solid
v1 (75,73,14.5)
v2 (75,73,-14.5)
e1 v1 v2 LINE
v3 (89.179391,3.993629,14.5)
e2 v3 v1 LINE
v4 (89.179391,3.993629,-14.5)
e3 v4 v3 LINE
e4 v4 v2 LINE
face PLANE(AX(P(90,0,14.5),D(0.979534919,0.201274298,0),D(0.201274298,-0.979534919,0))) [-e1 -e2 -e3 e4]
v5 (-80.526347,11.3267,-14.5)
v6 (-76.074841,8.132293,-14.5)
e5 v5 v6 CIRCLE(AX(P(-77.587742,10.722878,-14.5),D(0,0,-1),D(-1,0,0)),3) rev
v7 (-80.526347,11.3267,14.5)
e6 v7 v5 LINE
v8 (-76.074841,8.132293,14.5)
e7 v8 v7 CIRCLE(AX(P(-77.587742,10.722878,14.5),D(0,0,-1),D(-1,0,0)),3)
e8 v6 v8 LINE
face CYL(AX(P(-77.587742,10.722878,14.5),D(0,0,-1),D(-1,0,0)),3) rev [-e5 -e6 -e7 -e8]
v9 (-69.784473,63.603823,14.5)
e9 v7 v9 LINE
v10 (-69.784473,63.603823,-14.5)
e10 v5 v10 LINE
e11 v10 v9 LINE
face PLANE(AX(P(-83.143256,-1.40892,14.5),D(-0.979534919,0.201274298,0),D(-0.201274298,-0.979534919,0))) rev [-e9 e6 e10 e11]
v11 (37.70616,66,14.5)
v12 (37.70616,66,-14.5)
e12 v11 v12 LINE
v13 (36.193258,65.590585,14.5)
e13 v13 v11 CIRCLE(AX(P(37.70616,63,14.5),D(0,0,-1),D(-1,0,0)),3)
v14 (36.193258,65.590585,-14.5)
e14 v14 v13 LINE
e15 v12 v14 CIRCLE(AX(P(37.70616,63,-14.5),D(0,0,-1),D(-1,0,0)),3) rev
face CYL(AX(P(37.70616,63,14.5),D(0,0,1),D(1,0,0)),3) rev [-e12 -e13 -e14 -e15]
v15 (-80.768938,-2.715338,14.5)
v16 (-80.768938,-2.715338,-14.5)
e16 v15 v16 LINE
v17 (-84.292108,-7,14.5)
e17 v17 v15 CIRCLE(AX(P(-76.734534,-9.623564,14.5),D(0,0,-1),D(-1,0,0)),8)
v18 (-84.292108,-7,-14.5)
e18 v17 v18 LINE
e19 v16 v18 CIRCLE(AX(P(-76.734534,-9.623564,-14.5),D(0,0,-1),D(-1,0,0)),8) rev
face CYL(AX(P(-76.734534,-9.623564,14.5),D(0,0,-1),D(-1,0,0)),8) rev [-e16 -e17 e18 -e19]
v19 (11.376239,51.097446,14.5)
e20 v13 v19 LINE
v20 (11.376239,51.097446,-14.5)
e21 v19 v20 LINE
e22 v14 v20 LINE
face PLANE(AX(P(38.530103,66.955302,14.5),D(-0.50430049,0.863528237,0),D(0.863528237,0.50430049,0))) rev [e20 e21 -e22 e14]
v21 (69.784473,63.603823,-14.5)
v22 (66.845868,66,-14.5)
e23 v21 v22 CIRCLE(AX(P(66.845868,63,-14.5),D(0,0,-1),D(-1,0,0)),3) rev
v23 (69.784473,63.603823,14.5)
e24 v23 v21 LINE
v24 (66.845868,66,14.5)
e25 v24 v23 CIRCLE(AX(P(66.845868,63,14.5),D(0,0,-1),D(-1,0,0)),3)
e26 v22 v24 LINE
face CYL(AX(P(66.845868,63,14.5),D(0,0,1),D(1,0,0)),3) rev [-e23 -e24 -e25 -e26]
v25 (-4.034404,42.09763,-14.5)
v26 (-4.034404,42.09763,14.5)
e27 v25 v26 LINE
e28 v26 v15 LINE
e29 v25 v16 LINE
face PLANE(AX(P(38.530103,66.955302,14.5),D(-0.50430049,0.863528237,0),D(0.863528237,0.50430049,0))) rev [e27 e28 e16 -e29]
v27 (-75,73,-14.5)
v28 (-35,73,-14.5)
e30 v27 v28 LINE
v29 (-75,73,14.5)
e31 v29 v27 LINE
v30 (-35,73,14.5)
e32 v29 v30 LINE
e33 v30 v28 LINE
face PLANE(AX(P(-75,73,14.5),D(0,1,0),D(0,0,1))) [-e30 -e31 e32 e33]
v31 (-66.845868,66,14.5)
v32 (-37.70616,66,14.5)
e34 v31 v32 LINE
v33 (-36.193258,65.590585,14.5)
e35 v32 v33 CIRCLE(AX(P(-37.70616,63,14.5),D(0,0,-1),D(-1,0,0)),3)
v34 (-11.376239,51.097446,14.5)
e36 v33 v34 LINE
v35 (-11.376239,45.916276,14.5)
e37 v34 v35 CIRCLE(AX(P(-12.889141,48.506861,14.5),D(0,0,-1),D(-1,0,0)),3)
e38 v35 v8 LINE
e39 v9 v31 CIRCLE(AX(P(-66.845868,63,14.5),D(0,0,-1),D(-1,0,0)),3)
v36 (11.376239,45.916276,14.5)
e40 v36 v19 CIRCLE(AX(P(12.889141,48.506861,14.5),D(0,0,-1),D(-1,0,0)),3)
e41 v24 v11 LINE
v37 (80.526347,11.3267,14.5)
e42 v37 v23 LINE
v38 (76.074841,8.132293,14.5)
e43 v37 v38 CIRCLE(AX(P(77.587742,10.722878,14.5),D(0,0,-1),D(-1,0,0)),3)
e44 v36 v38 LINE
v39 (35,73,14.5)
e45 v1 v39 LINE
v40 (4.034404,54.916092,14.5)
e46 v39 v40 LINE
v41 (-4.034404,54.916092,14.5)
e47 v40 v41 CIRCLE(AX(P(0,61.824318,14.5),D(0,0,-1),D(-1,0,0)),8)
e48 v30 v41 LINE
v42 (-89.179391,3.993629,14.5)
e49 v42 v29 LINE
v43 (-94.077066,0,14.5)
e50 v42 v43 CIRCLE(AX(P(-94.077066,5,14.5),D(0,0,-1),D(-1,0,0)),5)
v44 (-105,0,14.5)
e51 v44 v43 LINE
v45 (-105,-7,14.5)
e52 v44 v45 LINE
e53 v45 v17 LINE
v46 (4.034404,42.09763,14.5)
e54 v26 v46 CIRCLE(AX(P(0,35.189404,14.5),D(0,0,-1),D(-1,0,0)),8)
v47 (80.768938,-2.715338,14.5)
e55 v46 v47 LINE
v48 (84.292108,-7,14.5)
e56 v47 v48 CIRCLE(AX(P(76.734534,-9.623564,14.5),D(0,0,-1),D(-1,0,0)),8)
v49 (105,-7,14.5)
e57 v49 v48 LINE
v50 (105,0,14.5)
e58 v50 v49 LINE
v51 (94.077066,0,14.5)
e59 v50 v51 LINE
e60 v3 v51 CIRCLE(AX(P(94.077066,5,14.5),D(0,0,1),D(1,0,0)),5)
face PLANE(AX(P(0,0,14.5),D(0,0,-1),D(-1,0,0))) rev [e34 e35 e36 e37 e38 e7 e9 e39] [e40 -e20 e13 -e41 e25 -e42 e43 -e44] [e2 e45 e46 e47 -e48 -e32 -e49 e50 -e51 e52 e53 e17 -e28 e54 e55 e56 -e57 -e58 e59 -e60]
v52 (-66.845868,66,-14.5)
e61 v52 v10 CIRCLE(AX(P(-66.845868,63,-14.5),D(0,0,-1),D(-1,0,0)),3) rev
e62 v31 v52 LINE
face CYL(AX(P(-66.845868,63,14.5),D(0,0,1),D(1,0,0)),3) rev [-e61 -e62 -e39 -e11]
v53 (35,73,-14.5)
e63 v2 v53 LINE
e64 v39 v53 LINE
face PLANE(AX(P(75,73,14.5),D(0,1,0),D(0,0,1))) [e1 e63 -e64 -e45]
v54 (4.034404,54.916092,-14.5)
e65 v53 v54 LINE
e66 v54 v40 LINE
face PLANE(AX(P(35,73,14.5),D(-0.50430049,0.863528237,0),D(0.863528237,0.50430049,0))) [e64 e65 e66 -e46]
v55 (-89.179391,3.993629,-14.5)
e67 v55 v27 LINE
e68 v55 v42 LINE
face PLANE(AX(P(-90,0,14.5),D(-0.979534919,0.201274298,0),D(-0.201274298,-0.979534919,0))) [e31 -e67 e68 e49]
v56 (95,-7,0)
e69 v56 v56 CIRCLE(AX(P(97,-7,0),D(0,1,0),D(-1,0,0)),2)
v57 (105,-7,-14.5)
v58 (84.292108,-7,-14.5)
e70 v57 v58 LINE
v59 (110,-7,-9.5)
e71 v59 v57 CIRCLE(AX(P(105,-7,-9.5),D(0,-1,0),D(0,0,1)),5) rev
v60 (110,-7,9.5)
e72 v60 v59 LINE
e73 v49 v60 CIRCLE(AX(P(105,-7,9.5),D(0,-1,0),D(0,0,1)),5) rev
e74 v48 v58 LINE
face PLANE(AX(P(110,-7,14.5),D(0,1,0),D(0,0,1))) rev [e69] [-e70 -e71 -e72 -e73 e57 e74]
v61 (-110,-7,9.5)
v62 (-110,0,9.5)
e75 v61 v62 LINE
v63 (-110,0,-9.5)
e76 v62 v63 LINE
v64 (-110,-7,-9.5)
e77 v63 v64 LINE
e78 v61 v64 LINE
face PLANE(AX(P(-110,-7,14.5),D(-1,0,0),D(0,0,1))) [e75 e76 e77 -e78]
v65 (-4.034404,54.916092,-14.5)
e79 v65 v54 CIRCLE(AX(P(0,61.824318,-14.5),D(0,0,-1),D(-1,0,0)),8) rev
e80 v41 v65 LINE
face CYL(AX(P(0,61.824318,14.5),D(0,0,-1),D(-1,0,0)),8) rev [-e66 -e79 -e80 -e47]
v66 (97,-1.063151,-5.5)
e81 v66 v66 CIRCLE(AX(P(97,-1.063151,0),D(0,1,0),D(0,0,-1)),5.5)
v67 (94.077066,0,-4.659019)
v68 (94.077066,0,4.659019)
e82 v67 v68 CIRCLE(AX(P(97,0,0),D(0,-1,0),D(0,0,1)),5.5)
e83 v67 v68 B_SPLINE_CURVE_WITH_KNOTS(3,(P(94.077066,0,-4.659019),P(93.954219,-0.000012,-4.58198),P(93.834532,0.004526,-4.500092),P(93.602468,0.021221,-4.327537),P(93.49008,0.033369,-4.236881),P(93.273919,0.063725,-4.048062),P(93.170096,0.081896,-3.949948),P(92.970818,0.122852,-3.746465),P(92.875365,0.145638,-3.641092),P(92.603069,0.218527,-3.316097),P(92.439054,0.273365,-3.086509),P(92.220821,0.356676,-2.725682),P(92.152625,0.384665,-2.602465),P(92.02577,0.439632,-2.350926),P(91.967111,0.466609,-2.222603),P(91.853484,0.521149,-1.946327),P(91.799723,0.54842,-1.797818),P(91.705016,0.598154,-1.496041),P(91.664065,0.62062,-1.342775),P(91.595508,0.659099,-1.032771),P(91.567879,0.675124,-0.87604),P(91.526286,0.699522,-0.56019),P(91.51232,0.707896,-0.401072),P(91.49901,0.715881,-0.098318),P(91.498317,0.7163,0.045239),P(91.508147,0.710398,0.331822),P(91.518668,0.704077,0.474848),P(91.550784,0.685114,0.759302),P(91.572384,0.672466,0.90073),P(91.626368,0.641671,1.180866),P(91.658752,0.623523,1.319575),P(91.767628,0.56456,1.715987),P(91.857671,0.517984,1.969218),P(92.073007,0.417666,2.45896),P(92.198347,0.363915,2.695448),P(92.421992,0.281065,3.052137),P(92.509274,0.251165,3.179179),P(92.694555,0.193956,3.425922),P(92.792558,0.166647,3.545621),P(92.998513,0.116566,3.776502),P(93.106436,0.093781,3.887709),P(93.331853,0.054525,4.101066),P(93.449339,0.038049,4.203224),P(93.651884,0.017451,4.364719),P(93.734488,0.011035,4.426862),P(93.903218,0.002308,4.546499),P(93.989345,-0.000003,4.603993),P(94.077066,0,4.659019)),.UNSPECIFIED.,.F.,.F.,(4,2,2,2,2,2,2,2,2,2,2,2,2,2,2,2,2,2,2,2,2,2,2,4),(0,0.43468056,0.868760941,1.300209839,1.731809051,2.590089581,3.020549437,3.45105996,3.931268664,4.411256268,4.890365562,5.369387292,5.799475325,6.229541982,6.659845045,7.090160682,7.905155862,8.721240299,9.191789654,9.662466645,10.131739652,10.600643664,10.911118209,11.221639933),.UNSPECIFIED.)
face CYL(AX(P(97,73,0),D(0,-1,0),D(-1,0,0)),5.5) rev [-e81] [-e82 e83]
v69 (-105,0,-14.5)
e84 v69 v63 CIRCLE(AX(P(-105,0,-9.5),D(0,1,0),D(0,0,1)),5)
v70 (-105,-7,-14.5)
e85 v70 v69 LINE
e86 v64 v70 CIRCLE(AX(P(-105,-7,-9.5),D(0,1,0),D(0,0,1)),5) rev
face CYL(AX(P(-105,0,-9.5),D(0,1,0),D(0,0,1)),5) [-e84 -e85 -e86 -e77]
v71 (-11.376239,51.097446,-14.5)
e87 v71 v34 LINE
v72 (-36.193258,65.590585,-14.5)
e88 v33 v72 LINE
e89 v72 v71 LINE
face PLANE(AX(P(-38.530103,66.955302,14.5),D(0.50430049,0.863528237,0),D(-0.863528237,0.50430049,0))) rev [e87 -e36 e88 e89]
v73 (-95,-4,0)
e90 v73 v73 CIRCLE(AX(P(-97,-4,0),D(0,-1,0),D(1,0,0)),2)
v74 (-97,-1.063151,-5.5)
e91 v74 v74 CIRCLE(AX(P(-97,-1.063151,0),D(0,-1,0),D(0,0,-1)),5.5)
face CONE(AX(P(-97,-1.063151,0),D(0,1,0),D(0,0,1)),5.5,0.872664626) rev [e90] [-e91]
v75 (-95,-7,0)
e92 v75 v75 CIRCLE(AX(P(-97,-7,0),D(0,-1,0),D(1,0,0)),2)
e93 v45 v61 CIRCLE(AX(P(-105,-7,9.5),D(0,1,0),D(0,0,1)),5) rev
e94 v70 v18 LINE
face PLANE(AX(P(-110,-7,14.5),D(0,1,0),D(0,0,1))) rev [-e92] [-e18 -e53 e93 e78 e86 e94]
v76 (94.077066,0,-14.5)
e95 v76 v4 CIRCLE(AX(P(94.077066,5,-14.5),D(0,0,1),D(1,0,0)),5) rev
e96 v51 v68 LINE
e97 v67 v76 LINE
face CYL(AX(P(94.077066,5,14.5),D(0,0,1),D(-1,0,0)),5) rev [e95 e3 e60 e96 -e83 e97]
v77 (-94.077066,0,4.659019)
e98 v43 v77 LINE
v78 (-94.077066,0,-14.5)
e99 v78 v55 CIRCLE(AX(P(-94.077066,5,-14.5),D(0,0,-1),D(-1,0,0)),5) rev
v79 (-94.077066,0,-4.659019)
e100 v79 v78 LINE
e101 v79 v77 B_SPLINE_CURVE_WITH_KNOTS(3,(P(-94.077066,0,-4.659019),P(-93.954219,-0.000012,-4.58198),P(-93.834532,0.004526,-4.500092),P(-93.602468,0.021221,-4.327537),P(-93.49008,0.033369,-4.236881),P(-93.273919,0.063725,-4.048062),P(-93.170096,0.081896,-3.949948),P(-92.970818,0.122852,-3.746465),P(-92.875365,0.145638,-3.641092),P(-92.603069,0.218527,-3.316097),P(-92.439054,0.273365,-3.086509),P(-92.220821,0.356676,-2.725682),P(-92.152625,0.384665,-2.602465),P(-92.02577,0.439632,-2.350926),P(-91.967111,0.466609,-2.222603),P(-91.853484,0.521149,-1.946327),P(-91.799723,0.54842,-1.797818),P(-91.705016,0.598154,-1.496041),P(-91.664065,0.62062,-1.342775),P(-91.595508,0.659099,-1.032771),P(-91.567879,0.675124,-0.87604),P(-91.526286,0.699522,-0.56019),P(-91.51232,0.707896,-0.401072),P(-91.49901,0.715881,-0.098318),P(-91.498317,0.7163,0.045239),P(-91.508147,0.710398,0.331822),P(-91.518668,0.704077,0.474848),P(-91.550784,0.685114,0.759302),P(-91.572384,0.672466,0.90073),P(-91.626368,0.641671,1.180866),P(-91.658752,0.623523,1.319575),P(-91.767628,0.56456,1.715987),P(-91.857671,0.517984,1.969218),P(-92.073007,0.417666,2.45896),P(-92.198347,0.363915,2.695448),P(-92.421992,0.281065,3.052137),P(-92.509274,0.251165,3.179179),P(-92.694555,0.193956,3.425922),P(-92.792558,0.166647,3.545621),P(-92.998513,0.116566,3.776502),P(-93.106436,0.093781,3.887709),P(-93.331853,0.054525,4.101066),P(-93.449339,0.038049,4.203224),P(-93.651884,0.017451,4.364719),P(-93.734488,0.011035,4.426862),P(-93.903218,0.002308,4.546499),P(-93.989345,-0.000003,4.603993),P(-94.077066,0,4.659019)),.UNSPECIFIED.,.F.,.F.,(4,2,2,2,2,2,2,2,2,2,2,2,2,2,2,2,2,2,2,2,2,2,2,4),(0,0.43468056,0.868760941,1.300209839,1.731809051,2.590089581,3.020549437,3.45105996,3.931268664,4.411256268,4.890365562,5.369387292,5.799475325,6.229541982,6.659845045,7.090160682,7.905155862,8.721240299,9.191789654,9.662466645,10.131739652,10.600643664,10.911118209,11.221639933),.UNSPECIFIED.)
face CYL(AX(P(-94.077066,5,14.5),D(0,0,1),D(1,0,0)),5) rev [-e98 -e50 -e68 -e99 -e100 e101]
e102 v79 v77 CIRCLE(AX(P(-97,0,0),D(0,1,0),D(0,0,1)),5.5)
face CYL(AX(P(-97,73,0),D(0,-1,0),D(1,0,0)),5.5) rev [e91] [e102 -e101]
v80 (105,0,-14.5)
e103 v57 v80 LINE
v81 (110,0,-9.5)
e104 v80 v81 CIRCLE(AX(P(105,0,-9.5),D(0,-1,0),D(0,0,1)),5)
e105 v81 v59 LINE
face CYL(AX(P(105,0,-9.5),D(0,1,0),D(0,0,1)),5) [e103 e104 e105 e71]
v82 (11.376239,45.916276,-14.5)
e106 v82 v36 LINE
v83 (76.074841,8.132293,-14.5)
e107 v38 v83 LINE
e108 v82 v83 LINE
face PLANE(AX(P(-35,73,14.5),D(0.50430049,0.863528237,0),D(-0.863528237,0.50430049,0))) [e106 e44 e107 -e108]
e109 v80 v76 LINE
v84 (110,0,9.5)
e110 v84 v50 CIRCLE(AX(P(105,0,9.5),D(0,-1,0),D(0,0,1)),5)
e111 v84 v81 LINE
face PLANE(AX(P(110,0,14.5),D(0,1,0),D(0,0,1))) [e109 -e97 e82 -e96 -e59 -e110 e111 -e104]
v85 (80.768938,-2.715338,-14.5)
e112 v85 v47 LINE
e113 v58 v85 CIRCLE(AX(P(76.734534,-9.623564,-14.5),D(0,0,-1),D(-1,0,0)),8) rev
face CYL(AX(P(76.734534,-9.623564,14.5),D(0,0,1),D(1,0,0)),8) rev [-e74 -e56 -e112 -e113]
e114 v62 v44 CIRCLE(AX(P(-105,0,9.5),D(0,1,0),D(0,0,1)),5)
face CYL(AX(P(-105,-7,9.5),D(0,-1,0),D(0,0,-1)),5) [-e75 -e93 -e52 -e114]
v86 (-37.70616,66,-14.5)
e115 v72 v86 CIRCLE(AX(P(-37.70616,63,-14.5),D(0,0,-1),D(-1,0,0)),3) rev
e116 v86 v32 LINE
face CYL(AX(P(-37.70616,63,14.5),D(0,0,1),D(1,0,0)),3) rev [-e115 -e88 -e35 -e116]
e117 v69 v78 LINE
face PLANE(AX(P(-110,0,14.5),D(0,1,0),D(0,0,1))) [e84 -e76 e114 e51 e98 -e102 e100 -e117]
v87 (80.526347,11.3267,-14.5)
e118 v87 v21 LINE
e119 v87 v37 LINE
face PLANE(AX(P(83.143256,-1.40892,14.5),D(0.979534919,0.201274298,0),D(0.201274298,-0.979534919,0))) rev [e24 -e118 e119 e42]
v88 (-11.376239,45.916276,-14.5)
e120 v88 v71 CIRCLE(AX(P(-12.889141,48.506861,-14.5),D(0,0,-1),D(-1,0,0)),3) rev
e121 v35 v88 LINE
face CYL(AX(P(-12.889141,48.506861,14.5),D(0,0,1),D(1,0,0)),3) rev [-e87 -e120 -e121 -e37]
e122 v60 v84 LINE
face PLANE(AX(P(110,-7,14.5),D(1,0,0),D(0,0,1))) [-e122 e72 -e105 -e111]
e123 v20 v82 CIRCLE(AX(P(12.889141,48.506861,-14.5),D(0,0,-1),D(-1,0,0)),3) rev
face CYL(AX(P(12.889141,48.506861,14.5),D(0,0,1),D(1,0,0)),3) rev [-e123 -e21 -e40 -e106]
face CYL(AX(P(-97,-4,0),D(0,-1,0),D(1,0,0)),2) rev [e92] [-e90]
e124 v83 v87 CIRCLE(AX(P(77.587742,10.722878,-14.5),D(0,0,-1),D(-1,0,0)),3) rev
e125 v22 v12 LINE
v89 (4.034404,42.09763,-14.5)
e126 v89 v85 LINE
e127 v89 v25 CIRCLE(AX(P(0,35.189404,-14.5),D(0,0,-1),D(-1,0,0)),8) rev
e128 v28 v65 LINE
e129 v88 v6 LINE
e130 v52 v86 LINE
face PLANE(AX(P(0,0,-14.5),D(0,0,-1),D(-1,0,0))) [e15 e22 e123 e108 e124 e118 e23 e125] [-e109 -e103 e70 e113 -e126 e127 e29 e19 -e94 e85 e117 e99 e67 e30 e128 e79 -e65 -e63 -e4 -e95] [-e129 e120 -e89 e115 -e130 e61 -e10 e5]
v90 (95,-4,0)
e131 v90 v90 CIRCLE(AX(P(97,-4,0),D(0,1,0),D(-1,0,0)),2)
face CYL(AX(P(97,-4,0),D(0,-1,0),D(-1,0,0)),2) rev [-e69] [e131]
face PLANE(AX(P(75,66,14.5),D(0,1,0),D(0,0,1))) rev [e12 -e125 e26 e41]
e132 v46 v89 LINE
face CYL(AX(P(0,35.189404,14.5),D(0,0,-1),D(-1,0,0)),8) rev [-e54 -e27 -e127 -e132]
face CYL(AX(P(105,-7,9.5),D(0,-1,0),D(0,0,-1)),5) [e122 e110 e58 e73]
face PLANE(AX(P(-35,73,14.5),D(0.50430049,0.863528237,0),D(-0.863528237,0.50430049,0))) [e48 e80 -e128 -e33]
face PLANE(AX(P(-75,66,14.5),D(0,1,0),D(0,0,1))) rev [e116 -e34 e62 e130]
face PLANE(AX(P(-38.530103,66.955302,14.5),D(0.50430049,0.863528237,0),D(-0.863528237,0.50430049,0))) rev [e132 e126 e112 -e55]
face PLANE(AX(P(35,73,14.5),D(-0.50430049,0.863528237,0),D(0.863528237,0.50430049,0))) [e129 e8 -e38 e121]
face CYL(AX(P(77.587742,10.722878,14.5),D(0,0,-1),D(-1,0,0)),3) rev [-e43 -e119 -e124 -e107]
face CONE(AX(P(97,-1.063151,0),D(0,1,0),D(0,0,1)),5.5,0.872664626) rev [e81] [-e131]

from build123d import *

# Parameters (mm, degrees)
EXTRU_MINCE1_DEPTH      = 14.5
CONG_1_R                = 5
CONG_2_R                = 5
ESQUISSE4_R             = 2
ENL_V_MAT_EXTRU_1_DEPTH = 3
ESQUISSE5_R             = 5.5
ENL_V_MAT_EXTRU_2_DEPTH = 136.052767465
CHANFREIN1_SIZE2        = 3.5
CHANFREIN1_SIZE         = 2.936848709
CONG_3_R                = 8
CONG_4_R                = 3


# Some blends are built 0.0001 mm under size
with BuildPart() as part:
    # Esquisse1 → Extru.-Mince1 (new, symmetric)
    with BuildSketch(Plane.XY):
        Polygon((-110, 0), (-90, 0), (-75, 73), (-35, 73), (90, 0), (86.469896568, -6.044697657), (-36.894311748, 66), (-69.292107606, 66), (-84.292107606, -7), (-110, -7), align=None)
    extrude(amount=EXTRU_MINCE1_DEPTH, both=True)

    # Congé1
    cong_1_edges = [part.edges().sort_by_distance(p)[0] for p in [
        (-110, -3.5, 14.5),
        (-110, -3.5, -14.5),
    ]]
    fillet(cong_1_edges, radius=CONG_1_R)

    # Congé2
    cong_2_edges = [part.edges().sort_by_distance(p)[0] for p in [
        (-90, 0, 0),
    ]]
    fillet(cong_2_edges, radius=CONG_2_R)

    # Esquisse4 → Enlèv. mat.-Extru.1 (cut)
    with BuildSketch(Plane.XZ.offset(7)):
        with Locations((-97, 0)):
            Circle(ESQUISSE4_R)
    extrude(amount=-ENL_V_MAT_EXTRU_1_DEPTH, mode=Mode.SUBTRACT)

    # Esquisse5 → Enlèv. mat.-Extru.2 (cut, through all)
    with BuildSketch(Plane.XZ.offset(4)):
        with Locations((-97, 0)):
            Circle(ESQUISSE5_R)
    extrude(amount=-ENL_V_MAT_EXTRU_2_DEPTH, mode=Mode.SUBTRACT)

    # Chanfrein1
    chanfrein1_edges = [part.edges().sort_by_distance(p)[0] for p in [
        (-102.5, -4, 0),
    ]]
    chanfrein1_side = [part.faces().sort_by_distance(p)[0] for p in [
        (-102.5, -3.941263026, 0),
    ]]
    chamfer(chanfrein1_edges, length=CHANFREIN1_SIZE - 0.0001, length2=CHANFREIN1_SIZE2 - 0.0001, reference=chanfrein1_side[0])  # a hair under: the kernel refuses the full size

    # Symétrie1: part across plane


with BuildPart() as part_1:
    add(part.part)
    add(part.part.mirror(Plane(origin=(0, 0, 0), x_dir=(0, 0, 1), z_dir=(1, 0, 0))))

    # Congé3
    # the kernel refuses this fillet: 8 mm, written as the material it adds along each edge
    with BuildSketch(Plane(origin=(0, 52.56, 14.5), x_dir=(-0.8635282366882334, 0.504300490225927, 0), z_dir=(0, 0, -1))) as cong_3_piece_1:
        with BuildLine():
            CenterArc((CONG_3_R * 0.584, CONG_3_R), CONG_3_R, 209.430143301, 60.569856699)
            Line((-CONG_3_R * 0.286955426172, CONG_3_R * 0.508637968884), (-CONG_3_R * 0.304374534695, CONG_3_R * 0.498810728262))
            Line((-CONG_3_R * 0.304374534695, CONG_3_R * 0.498810728262), (-CONG_3_R * 0.01168, -CONG_3_R * 0.02))
            Line((-CONG_3_R * 0.01168, -CONG_3_R * 0.02), (CONG_3_R * 0.584, -CONG_3_R * 0.02))
            Line((CONG_3_R * 0.584, -CONG_3_R * 0.02), (CONG_3_R * 0.584, 0))
        make_face()
    extrude(amount=29)
    with BuildSketch(Plane(origin=(0, 44.453721939, 14.5), x_dir=(-0.8635282366882323, -0.5043004902259292, 0), z_dir=(0, 0, -1))) as cong_3_piece_2:
        with BuildLine():
            CenterArc((CONG_3_R * 0.584, -CONG_3_R), CONG_3_R, 90, 60.569856699)
            Line((-CONG_3_R * 0.286955426172, -CONG_3_R * 0.508637968884), (-CONG_3_R * 0.304374534695, -CONG_3_R * 0.498810728262))
            Line((-CONG_3_R * 0.304374534695, -CONG_3_R * 0.498810728262), (-CONG_3_R * 0.01168, CONG_3_R * 0.02))
            Line((-CONG_3_R * 0.01168, CONG_3_R * 0.02), (CONG_3_R * 0.584, CONG_3_R * 0.02))
            Line((CONG_3_R * 0.584, CONG_3_R * 0.02), (CONG_3_R * 0.584, 0))
        make_face()
    extrude(amount=29)
    with BuildSketch(Plane(origin=(83.772073882, -4.469169208, -14.5), x_dir=(-0.8635282366882329, 0.504300490225928, 0), z_dir=(0, 0, 1))) as cong_3_piece_3:
        with BuildLine():
            CenterArc((3.477750225, 8), CONG_3_R, 229.429051082, 40.570948918)
            Line((-1.725363014, 1.923190589), (-1.829425279, 1.801654401))
            ThreePointArc((-1.829425279, 1.801654401), (-0.981778041, 0.854749538), (-0.119096533, -0.106845757))
            Line((-0.119096533, -0.106845757), (0, -0.16))
            Line((0, -0.16), (3.477750225, -0.16))
            Line((3.477750225, -0.16), (3.477750225, 0))
        make_face()
    extrude(amount=29)
    with BuildSketch(Plane(origin=(-83.772073882, -4.469169208, -14.5), x_dir=(-0.20127429834952004, -0.979534918634302, 0), z_dir=(0, 0, 1))) as cong_3_piece_4:
        with BuildLine():
            CenterArc((3.632433829, 7.930962811), CONG_3_R, 221.896414773, 40.570948918)
            Line((-2.322392841, 2.588674974), (-2.441489374, 2.481829217))
            Line((-2.441489374, 2.481829217), (-0.119096533, -0.106845757))
            Line((-0.119096533, -0.106845757), (0, -0.16))
            ThreePointArc((0, -0.16), (1.291853279, -0.16), (2.562732012, -0.158619256))
            Line((2.562732012, -0.158619256), (2.583706557, 0))
        make_face()
    extrude(amount=29)

    # Congé4
    cong_4_edges = [part_1.edges().sort_by_distance(p)[0] for p in [
        (-36.894311748, 66, 0),
        (-69.292107606, 66, 0),
        (6.940306559, 48.50686097, 0),
        (-6.940306559, 48.50686097, 0),
        (81.879263002, 4.742510407, 0),
        (-81.879263002, 4.742510407, 0),
        (69.292107606, 66, 0),
        (36.894311748, 66, 0),
    ]]
    fillet(cong_4_edges, radius=CONG_4_R)


solid = part_1.part
